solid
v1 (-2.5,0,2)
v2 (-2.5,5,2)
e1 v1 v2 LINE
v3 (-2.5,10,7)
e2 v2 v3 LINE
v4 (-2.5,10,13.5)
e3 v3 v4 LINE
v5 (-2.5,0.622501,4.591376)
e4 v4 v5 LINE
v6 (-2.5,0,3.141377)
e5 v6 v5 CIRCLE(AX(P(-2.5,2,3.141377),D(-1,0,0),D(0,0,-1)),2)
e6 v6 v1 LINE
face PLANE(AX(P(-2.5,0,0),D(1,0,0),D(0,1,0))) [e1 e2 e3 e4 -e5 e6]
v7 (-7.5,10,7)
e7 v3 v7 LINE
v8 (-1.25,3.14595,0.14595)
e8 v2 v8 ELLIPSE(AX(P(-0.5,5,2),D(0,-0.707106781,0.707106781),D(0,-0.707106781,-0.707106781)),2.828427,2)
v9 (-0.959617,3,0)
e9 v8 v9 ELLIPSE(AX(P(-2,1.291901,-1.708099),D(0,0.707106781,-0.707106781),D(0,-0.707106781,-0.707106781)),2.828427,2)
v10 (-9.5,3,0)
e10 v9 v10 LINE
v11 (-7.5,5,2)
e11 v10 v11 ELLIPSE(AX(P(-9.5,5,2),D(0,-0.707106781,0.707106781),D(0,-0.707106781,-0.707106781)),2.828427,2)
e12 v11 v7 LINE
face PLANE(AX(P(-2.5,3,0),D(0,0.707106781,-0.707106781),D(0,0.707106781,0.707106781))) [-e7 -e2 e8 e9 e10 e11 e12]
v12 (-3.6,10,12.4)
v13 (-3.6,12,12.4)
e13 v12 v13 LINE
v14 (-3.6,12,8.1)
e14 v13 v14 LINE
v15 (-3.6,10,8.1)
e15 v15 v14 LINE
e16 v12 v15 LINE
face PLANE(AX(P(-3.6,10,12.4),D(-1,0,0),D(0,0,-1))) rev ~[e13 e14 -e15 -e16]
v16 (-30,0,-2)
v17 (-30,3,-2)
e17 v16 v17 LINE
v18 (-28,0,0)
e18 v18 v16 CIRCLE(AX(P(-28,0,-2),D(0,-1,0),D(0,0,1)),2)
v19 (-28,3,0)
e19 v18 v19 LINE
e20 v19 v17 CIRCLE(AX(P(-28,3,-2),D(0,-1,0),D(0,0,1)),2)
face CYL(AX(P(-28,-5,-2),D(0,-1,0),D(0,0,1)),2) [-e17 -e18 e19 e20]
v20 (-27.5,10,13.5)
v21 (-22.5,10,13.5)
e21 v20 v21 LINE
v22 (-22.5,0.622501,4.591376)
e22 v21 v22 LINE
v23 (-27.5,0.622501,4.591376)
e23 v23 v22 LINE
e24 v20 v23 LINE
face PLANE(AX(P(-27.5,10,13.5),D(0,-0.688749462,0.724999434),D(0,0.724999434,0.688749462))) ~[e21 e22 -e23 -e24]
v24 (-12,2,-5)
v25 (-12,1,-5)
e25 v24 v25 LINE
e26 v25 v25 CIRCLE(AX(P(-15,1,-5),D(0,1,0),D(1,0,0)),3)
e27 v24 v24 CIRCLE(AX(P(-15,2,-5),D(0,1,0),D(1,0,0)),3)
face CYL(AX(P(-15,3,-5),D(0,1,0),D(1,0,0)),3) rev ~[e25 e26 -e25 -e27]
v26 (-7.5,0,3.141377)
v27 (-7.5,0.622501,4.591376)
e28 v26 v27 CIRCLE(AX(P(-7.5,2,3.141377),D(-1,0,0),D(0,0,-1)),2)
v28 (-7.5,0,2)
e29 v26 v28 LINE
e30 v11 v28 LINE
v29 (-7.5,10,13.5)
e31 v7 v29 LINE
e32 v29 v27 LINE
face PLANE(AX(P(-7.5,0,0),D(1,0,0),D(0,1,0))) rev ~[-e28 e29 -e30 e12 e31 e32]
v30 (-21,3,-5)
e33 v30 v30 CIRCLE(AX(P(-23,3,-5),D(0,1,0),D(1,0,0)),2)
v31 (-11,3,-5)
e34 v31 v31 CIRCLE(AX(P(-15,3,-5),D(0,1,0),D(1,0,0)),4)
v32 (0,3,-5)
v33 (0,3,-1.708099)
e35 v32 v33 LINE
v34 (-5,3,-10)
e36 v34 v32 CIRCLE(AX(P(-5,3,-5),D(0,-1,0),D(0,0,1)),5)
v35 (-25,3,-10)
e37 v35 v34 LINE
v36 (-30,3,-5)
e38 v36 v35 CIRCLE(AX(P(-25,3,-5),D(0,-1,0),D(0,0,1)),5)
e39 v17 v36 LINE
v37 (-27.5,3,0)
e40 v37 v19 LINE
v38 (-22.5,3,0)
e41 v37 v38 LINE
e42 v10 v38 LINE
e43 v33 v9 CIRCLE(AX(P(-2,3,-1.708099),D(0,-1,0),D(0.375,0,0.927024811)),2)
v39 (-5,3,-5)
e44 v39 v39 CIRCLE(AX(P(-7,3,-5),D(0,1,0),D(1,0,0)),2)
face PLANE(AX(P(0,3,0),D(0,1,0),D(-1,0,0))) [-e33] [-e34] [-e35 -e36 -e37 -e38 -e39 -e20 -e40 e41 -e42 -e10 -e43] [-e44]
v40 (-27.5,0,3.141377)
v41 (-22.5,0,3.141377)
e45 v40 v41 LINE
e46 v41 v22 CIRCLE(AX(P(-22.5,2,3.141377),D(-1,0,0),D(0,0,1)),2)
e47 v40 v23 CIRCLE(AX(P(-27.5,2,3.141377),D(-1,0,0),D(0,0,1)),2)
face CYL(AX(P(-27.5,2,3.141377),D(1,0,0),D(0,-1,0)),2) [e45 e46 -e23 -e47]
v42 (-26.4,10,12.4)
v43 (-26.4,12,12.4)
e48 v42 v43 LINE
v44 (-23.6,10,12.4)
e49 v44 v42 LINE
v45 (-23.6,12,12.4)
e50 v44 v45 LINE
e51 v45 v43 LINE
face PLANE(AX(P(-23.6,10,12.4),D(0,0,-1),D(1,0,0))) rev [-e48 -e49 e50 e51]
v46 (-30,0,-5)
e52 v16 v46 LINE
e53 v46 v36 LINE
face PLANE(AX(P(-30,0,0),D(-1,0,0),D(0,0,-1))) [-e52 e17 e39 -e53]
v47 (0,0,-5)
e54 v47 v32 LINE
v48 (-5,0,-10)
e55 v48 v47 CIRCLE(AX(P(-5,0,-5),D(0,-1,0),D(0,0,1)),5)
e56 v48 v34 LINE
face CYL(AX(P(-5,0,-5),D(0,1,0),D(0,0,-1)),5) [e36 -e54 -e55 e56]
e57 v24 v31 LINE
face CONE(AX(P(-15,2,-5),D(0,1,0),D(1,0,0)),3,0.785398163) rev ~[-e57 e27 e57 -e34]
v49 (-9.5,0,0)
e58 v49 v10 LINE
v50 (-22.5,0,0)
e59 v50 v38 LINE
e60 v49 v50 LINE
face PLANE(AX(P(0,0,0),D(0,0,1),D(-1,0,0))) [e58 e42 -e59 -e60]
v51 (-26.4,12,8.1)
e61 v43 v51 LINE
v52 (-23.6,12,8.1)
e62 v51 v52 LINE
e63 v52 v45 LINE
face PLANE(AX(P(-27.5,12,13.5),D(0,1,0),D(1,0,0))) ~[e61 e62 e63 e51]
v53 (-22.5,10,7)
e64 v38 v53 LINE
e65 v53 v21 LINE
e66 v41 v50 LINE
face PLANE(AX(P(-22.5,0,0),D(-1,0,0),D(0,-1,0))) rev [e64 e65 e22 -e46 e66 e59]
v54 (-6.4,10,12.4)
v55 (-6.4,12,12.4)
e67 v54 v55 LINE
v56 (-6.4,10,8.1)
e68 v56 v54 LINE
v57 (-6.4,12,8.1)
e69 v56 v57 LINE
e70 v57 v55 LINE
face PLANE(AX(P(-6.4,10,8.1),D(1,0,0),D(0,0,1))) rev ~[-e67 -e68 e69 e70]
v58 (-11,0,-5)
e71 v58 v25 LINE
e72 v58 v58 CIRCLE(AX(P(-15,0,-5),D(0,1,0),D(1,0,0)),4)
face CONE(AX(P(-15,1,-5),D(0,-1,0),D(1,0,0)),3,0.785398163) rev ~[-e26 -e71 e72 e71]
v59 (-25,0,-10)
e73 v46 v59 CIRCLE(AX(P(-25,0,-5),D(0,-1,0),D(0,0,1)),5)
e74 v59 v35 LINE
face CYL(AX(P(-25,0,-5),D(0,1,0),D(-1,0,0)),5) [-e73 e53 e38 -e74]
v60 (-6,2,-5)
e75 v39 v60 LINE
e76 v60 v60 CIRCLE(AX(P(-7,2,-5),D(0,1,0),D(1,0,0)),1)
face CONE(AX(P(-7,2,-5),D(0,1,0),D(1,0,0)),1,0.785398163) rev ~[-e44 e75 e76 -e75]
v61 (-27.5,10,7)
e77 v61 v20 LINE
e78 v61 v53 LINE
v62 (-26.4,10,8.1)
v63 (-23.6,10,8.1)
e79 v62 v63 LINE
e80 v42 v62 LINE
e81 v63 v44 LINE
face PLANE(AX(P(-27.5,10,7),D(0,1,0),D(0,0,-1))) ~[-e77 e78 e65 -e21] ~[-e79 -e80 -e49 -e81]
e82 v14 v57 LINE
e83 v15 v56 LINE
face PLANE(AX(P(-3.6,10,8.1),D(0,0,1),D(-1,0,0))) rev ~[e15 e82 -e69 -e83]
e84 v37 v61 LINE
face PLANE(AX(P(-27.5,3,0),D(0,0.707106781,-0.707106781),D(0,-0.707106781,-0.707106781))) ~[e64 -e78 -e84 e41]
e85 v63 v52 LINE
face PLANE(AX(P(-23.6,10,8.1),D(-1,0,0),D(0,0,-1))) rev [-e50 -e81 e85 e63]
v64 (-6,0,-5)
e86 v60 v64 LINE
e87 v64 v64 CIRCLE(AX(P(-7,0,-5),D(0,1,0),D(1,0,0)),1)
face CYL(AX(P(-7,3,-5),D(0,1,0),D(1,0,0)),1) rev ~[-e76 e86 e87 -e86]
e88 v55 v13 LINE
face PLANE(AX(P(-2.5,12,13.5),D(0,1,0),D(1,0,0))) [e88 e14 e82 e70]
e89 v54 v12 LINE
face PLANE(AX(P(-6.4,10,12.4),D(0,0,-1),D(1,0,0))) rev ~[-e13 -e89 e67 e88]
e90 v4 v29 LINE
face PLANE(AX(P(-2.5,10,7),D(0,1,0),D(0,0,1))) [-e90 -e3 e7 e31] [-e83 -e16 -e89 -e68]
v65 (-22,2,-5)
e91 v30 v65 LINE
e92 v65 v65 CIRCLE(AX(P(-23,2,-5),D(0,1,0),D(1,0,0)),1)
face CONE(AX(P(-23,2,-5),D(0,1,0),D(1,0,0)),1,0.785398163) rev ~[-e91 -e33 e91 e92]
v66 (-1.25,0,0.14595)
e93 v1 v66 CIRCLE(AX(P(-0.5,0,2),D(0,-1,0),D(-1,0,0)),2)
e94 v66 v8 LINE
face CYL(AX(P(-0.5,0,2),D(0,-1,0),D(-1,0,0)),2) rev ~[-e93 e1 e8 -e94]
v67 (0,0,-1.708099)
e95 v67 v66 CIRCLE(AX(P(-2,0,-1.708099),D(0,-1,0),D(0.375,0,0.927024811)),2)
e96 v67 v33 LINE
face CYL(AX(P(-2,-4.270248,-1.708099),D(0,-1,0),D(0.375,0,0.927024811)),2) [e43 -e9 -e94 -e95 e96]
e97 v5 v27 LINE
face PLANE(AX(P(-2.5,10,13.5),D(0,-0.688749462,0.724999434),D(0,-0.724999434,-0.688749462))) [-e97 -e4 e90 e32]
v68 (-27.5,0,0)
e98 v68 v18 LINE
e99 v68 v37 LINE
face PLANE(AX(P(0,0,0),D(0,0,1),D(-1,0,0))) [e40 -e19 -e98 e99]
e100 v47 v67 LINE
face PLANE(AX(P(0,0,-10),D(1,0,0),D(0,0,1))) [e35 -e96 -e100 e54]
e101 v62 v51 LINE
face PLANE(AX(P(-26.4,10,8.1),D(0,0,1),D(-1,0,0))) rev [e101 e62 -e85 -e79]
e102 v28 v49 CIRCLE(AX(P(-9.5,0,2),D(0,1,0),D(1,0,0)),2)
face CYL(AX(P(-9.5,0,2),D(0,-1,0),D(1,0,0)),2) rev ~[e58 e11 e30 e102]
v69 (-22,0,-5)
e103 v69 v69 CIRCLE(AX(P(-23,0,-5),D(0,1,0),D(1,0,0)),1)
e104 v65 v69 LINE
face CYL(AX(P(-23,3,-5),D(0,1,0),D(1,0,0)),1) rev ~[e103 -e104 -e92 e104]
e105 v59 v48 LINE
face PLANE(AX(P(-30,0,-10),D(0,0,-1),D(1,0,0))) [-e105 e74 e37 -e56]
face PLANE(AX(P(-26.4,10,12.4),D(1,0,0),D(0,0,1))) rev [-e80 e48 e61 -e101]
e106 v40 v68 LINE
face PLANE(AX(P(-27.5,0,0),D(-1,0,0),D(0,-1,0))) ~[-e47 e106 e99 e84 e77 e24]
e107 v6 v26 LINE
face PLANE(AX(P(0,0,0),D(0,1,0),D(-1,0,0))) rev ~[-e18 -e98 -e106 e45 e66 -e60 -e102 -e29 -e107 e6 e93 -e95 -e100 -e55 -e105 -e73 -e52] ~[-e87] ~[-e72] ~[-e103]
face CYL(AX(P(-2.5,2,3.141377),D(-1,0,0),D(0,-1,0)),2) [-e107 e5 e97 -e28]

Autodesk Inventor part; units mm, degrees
ref_plane "XZ Plane" through (0, 0, 0) normal (0, 1, 0) x (-1, 0, 0)
sketch "Sketch1" plane through (0, 0, 0) normal (0, 1, 0) x (-1, 0, 0)
  line L0 (0, 0) -> (30, 0)
  line L1 (30, 0) -> (30, -10)
  line L2 (30, -10) -> (0, -10)
  line L3 (0, -10) -> (0, 0)
  dimension "d0" = 30
  dimension "d1" = 10
extrude "Extrusion1" add sketch "Sketch1" along normal blind 3
ref_plane "Work Plane2" through (-2.5, 0, 0) normal (1, 0, 0) x (0, 1, 0)
sketch "Sketch3" plane through (-2.5, 0, 0) normal (1, 0, 0) x (0, 1, 0)
  line L0 (3, -10) -> (3, 0) projected
  line L1 (3, 0) -> (10, 7)
  line L2 (10, 7) -> (10, 13.5)
  line L3 (10, 13.5) -> (0, 4)
  line L4 (0, 4) -> (0, 0)
  line L5 (0, 0) -> (3, 0) projected
  line L6 (3, 0) -> (0, 0)
  dimension "d13" = 4
  dimension "d14" = 6.5
  dimension "d15" = 45
  dimension "d16" = 10
extrude "Extrusion3" add sketch "Sketch3" against normal blind 5
ref_plane "Work Plane3" through (-15, 0, 0) normal (1, 0, 0) x (0, 1, 0)
fillet "Fillet2" radius 2 1 edges at (-5, 0, 4)
fillet "Fillet3" radius 2 4 edges at (-30, 1.5, 0) (-7.5, 1.5, 0) (-2.5, 1.5, 0) (0, 1.5, 0)
fillet "Fillet4" radius 5 2 edges at (-30, 1.5, -10) (0, 1.5, -10)
sketch "Sketch5" plane through (-2.5, 10, 13.5) normal (0, 1, 0) x (1, 0, 0)
  line L0 (-1.1, 5.4) -> (-3.9, 5.4)
  line L1 (-3.9, 5.4) -> (-3.9, 1.1)
  line L2 (-3.9, 1.1) -> (-1.1, 1.1)
  line L3 (-1.1, 1.1) -> (-1.1, 5.4)
  line L4 (-5, 0) -> (-5, 6.5) projected
  line L5 (0, 6.5) -> (-5, 6.5) projected
  point P0 (2.5, 13.5)
  dimension "d26" = 2.8
  dimension "d27" = 4.3
  dimension "d28" = 1.1
  dimension "d29" = 1.1
extrude "Extrusion4" add sketch "Sketch5" along normal blind 2
mirror "Mirror2" about plane through (-15, 0, 0) normal (1, 0, 0) of "Extrusion3", "Extrusion4"
sketch "Sketch6" plane through (0, 3, 0) normal (0, 1, 0) x (1, 0, 0)
  circle A0 centre (-15, 5) radius 3
  line L0 (-5, 10) -> (-25, 10) projected
  line L1 (0, 1.7081) -> (0, 5) projected
  point P0 (0, 0)
  dimension "d32" = 6
  dimension "d33" = 5
  dimension "d34" = 15
extrude "Extrusion5" cut sketch "Sketch6" against normal through all
chamfer "Chamfer1" distance 1 angle 45 1 edges at (-18, 3, -5)
sketch "Sketch7" plane through (0, 3, 0) normal (0, 1, 0) x (1, 0, 0)
  circle A0 centre (-23, 5) radius 1
  circle A1 centre (-7, 5) radius 1
  line L0 (-5, 10) -> (-25, 10) projected
  circle A2 centre (-15, 5) radius 3 projected
  point P0 (0, 0)
  dimension "d40" = 2
  dimension "d41" = 2
  dimension "d42" = 5
  dimension "d43" = 5
  dimension "d44" = 8
  dimension "d45" = 8
extrude "Extrusion6" cut sketch "Sketch7" against normal through all contours A0 | A1
chamfer "Chamfer2" distance 1 angle 45 2 edges at (-8, 3, -5) (-24, 3, -5)
fillet "Fillet5" radius 2 1 edges at (-25, 0, 4)
chamfer "Chamfer3" distance 1 angle 45 1 edges at (-18, 0, -5)
properties part number "ServoUltrasonicMount"
